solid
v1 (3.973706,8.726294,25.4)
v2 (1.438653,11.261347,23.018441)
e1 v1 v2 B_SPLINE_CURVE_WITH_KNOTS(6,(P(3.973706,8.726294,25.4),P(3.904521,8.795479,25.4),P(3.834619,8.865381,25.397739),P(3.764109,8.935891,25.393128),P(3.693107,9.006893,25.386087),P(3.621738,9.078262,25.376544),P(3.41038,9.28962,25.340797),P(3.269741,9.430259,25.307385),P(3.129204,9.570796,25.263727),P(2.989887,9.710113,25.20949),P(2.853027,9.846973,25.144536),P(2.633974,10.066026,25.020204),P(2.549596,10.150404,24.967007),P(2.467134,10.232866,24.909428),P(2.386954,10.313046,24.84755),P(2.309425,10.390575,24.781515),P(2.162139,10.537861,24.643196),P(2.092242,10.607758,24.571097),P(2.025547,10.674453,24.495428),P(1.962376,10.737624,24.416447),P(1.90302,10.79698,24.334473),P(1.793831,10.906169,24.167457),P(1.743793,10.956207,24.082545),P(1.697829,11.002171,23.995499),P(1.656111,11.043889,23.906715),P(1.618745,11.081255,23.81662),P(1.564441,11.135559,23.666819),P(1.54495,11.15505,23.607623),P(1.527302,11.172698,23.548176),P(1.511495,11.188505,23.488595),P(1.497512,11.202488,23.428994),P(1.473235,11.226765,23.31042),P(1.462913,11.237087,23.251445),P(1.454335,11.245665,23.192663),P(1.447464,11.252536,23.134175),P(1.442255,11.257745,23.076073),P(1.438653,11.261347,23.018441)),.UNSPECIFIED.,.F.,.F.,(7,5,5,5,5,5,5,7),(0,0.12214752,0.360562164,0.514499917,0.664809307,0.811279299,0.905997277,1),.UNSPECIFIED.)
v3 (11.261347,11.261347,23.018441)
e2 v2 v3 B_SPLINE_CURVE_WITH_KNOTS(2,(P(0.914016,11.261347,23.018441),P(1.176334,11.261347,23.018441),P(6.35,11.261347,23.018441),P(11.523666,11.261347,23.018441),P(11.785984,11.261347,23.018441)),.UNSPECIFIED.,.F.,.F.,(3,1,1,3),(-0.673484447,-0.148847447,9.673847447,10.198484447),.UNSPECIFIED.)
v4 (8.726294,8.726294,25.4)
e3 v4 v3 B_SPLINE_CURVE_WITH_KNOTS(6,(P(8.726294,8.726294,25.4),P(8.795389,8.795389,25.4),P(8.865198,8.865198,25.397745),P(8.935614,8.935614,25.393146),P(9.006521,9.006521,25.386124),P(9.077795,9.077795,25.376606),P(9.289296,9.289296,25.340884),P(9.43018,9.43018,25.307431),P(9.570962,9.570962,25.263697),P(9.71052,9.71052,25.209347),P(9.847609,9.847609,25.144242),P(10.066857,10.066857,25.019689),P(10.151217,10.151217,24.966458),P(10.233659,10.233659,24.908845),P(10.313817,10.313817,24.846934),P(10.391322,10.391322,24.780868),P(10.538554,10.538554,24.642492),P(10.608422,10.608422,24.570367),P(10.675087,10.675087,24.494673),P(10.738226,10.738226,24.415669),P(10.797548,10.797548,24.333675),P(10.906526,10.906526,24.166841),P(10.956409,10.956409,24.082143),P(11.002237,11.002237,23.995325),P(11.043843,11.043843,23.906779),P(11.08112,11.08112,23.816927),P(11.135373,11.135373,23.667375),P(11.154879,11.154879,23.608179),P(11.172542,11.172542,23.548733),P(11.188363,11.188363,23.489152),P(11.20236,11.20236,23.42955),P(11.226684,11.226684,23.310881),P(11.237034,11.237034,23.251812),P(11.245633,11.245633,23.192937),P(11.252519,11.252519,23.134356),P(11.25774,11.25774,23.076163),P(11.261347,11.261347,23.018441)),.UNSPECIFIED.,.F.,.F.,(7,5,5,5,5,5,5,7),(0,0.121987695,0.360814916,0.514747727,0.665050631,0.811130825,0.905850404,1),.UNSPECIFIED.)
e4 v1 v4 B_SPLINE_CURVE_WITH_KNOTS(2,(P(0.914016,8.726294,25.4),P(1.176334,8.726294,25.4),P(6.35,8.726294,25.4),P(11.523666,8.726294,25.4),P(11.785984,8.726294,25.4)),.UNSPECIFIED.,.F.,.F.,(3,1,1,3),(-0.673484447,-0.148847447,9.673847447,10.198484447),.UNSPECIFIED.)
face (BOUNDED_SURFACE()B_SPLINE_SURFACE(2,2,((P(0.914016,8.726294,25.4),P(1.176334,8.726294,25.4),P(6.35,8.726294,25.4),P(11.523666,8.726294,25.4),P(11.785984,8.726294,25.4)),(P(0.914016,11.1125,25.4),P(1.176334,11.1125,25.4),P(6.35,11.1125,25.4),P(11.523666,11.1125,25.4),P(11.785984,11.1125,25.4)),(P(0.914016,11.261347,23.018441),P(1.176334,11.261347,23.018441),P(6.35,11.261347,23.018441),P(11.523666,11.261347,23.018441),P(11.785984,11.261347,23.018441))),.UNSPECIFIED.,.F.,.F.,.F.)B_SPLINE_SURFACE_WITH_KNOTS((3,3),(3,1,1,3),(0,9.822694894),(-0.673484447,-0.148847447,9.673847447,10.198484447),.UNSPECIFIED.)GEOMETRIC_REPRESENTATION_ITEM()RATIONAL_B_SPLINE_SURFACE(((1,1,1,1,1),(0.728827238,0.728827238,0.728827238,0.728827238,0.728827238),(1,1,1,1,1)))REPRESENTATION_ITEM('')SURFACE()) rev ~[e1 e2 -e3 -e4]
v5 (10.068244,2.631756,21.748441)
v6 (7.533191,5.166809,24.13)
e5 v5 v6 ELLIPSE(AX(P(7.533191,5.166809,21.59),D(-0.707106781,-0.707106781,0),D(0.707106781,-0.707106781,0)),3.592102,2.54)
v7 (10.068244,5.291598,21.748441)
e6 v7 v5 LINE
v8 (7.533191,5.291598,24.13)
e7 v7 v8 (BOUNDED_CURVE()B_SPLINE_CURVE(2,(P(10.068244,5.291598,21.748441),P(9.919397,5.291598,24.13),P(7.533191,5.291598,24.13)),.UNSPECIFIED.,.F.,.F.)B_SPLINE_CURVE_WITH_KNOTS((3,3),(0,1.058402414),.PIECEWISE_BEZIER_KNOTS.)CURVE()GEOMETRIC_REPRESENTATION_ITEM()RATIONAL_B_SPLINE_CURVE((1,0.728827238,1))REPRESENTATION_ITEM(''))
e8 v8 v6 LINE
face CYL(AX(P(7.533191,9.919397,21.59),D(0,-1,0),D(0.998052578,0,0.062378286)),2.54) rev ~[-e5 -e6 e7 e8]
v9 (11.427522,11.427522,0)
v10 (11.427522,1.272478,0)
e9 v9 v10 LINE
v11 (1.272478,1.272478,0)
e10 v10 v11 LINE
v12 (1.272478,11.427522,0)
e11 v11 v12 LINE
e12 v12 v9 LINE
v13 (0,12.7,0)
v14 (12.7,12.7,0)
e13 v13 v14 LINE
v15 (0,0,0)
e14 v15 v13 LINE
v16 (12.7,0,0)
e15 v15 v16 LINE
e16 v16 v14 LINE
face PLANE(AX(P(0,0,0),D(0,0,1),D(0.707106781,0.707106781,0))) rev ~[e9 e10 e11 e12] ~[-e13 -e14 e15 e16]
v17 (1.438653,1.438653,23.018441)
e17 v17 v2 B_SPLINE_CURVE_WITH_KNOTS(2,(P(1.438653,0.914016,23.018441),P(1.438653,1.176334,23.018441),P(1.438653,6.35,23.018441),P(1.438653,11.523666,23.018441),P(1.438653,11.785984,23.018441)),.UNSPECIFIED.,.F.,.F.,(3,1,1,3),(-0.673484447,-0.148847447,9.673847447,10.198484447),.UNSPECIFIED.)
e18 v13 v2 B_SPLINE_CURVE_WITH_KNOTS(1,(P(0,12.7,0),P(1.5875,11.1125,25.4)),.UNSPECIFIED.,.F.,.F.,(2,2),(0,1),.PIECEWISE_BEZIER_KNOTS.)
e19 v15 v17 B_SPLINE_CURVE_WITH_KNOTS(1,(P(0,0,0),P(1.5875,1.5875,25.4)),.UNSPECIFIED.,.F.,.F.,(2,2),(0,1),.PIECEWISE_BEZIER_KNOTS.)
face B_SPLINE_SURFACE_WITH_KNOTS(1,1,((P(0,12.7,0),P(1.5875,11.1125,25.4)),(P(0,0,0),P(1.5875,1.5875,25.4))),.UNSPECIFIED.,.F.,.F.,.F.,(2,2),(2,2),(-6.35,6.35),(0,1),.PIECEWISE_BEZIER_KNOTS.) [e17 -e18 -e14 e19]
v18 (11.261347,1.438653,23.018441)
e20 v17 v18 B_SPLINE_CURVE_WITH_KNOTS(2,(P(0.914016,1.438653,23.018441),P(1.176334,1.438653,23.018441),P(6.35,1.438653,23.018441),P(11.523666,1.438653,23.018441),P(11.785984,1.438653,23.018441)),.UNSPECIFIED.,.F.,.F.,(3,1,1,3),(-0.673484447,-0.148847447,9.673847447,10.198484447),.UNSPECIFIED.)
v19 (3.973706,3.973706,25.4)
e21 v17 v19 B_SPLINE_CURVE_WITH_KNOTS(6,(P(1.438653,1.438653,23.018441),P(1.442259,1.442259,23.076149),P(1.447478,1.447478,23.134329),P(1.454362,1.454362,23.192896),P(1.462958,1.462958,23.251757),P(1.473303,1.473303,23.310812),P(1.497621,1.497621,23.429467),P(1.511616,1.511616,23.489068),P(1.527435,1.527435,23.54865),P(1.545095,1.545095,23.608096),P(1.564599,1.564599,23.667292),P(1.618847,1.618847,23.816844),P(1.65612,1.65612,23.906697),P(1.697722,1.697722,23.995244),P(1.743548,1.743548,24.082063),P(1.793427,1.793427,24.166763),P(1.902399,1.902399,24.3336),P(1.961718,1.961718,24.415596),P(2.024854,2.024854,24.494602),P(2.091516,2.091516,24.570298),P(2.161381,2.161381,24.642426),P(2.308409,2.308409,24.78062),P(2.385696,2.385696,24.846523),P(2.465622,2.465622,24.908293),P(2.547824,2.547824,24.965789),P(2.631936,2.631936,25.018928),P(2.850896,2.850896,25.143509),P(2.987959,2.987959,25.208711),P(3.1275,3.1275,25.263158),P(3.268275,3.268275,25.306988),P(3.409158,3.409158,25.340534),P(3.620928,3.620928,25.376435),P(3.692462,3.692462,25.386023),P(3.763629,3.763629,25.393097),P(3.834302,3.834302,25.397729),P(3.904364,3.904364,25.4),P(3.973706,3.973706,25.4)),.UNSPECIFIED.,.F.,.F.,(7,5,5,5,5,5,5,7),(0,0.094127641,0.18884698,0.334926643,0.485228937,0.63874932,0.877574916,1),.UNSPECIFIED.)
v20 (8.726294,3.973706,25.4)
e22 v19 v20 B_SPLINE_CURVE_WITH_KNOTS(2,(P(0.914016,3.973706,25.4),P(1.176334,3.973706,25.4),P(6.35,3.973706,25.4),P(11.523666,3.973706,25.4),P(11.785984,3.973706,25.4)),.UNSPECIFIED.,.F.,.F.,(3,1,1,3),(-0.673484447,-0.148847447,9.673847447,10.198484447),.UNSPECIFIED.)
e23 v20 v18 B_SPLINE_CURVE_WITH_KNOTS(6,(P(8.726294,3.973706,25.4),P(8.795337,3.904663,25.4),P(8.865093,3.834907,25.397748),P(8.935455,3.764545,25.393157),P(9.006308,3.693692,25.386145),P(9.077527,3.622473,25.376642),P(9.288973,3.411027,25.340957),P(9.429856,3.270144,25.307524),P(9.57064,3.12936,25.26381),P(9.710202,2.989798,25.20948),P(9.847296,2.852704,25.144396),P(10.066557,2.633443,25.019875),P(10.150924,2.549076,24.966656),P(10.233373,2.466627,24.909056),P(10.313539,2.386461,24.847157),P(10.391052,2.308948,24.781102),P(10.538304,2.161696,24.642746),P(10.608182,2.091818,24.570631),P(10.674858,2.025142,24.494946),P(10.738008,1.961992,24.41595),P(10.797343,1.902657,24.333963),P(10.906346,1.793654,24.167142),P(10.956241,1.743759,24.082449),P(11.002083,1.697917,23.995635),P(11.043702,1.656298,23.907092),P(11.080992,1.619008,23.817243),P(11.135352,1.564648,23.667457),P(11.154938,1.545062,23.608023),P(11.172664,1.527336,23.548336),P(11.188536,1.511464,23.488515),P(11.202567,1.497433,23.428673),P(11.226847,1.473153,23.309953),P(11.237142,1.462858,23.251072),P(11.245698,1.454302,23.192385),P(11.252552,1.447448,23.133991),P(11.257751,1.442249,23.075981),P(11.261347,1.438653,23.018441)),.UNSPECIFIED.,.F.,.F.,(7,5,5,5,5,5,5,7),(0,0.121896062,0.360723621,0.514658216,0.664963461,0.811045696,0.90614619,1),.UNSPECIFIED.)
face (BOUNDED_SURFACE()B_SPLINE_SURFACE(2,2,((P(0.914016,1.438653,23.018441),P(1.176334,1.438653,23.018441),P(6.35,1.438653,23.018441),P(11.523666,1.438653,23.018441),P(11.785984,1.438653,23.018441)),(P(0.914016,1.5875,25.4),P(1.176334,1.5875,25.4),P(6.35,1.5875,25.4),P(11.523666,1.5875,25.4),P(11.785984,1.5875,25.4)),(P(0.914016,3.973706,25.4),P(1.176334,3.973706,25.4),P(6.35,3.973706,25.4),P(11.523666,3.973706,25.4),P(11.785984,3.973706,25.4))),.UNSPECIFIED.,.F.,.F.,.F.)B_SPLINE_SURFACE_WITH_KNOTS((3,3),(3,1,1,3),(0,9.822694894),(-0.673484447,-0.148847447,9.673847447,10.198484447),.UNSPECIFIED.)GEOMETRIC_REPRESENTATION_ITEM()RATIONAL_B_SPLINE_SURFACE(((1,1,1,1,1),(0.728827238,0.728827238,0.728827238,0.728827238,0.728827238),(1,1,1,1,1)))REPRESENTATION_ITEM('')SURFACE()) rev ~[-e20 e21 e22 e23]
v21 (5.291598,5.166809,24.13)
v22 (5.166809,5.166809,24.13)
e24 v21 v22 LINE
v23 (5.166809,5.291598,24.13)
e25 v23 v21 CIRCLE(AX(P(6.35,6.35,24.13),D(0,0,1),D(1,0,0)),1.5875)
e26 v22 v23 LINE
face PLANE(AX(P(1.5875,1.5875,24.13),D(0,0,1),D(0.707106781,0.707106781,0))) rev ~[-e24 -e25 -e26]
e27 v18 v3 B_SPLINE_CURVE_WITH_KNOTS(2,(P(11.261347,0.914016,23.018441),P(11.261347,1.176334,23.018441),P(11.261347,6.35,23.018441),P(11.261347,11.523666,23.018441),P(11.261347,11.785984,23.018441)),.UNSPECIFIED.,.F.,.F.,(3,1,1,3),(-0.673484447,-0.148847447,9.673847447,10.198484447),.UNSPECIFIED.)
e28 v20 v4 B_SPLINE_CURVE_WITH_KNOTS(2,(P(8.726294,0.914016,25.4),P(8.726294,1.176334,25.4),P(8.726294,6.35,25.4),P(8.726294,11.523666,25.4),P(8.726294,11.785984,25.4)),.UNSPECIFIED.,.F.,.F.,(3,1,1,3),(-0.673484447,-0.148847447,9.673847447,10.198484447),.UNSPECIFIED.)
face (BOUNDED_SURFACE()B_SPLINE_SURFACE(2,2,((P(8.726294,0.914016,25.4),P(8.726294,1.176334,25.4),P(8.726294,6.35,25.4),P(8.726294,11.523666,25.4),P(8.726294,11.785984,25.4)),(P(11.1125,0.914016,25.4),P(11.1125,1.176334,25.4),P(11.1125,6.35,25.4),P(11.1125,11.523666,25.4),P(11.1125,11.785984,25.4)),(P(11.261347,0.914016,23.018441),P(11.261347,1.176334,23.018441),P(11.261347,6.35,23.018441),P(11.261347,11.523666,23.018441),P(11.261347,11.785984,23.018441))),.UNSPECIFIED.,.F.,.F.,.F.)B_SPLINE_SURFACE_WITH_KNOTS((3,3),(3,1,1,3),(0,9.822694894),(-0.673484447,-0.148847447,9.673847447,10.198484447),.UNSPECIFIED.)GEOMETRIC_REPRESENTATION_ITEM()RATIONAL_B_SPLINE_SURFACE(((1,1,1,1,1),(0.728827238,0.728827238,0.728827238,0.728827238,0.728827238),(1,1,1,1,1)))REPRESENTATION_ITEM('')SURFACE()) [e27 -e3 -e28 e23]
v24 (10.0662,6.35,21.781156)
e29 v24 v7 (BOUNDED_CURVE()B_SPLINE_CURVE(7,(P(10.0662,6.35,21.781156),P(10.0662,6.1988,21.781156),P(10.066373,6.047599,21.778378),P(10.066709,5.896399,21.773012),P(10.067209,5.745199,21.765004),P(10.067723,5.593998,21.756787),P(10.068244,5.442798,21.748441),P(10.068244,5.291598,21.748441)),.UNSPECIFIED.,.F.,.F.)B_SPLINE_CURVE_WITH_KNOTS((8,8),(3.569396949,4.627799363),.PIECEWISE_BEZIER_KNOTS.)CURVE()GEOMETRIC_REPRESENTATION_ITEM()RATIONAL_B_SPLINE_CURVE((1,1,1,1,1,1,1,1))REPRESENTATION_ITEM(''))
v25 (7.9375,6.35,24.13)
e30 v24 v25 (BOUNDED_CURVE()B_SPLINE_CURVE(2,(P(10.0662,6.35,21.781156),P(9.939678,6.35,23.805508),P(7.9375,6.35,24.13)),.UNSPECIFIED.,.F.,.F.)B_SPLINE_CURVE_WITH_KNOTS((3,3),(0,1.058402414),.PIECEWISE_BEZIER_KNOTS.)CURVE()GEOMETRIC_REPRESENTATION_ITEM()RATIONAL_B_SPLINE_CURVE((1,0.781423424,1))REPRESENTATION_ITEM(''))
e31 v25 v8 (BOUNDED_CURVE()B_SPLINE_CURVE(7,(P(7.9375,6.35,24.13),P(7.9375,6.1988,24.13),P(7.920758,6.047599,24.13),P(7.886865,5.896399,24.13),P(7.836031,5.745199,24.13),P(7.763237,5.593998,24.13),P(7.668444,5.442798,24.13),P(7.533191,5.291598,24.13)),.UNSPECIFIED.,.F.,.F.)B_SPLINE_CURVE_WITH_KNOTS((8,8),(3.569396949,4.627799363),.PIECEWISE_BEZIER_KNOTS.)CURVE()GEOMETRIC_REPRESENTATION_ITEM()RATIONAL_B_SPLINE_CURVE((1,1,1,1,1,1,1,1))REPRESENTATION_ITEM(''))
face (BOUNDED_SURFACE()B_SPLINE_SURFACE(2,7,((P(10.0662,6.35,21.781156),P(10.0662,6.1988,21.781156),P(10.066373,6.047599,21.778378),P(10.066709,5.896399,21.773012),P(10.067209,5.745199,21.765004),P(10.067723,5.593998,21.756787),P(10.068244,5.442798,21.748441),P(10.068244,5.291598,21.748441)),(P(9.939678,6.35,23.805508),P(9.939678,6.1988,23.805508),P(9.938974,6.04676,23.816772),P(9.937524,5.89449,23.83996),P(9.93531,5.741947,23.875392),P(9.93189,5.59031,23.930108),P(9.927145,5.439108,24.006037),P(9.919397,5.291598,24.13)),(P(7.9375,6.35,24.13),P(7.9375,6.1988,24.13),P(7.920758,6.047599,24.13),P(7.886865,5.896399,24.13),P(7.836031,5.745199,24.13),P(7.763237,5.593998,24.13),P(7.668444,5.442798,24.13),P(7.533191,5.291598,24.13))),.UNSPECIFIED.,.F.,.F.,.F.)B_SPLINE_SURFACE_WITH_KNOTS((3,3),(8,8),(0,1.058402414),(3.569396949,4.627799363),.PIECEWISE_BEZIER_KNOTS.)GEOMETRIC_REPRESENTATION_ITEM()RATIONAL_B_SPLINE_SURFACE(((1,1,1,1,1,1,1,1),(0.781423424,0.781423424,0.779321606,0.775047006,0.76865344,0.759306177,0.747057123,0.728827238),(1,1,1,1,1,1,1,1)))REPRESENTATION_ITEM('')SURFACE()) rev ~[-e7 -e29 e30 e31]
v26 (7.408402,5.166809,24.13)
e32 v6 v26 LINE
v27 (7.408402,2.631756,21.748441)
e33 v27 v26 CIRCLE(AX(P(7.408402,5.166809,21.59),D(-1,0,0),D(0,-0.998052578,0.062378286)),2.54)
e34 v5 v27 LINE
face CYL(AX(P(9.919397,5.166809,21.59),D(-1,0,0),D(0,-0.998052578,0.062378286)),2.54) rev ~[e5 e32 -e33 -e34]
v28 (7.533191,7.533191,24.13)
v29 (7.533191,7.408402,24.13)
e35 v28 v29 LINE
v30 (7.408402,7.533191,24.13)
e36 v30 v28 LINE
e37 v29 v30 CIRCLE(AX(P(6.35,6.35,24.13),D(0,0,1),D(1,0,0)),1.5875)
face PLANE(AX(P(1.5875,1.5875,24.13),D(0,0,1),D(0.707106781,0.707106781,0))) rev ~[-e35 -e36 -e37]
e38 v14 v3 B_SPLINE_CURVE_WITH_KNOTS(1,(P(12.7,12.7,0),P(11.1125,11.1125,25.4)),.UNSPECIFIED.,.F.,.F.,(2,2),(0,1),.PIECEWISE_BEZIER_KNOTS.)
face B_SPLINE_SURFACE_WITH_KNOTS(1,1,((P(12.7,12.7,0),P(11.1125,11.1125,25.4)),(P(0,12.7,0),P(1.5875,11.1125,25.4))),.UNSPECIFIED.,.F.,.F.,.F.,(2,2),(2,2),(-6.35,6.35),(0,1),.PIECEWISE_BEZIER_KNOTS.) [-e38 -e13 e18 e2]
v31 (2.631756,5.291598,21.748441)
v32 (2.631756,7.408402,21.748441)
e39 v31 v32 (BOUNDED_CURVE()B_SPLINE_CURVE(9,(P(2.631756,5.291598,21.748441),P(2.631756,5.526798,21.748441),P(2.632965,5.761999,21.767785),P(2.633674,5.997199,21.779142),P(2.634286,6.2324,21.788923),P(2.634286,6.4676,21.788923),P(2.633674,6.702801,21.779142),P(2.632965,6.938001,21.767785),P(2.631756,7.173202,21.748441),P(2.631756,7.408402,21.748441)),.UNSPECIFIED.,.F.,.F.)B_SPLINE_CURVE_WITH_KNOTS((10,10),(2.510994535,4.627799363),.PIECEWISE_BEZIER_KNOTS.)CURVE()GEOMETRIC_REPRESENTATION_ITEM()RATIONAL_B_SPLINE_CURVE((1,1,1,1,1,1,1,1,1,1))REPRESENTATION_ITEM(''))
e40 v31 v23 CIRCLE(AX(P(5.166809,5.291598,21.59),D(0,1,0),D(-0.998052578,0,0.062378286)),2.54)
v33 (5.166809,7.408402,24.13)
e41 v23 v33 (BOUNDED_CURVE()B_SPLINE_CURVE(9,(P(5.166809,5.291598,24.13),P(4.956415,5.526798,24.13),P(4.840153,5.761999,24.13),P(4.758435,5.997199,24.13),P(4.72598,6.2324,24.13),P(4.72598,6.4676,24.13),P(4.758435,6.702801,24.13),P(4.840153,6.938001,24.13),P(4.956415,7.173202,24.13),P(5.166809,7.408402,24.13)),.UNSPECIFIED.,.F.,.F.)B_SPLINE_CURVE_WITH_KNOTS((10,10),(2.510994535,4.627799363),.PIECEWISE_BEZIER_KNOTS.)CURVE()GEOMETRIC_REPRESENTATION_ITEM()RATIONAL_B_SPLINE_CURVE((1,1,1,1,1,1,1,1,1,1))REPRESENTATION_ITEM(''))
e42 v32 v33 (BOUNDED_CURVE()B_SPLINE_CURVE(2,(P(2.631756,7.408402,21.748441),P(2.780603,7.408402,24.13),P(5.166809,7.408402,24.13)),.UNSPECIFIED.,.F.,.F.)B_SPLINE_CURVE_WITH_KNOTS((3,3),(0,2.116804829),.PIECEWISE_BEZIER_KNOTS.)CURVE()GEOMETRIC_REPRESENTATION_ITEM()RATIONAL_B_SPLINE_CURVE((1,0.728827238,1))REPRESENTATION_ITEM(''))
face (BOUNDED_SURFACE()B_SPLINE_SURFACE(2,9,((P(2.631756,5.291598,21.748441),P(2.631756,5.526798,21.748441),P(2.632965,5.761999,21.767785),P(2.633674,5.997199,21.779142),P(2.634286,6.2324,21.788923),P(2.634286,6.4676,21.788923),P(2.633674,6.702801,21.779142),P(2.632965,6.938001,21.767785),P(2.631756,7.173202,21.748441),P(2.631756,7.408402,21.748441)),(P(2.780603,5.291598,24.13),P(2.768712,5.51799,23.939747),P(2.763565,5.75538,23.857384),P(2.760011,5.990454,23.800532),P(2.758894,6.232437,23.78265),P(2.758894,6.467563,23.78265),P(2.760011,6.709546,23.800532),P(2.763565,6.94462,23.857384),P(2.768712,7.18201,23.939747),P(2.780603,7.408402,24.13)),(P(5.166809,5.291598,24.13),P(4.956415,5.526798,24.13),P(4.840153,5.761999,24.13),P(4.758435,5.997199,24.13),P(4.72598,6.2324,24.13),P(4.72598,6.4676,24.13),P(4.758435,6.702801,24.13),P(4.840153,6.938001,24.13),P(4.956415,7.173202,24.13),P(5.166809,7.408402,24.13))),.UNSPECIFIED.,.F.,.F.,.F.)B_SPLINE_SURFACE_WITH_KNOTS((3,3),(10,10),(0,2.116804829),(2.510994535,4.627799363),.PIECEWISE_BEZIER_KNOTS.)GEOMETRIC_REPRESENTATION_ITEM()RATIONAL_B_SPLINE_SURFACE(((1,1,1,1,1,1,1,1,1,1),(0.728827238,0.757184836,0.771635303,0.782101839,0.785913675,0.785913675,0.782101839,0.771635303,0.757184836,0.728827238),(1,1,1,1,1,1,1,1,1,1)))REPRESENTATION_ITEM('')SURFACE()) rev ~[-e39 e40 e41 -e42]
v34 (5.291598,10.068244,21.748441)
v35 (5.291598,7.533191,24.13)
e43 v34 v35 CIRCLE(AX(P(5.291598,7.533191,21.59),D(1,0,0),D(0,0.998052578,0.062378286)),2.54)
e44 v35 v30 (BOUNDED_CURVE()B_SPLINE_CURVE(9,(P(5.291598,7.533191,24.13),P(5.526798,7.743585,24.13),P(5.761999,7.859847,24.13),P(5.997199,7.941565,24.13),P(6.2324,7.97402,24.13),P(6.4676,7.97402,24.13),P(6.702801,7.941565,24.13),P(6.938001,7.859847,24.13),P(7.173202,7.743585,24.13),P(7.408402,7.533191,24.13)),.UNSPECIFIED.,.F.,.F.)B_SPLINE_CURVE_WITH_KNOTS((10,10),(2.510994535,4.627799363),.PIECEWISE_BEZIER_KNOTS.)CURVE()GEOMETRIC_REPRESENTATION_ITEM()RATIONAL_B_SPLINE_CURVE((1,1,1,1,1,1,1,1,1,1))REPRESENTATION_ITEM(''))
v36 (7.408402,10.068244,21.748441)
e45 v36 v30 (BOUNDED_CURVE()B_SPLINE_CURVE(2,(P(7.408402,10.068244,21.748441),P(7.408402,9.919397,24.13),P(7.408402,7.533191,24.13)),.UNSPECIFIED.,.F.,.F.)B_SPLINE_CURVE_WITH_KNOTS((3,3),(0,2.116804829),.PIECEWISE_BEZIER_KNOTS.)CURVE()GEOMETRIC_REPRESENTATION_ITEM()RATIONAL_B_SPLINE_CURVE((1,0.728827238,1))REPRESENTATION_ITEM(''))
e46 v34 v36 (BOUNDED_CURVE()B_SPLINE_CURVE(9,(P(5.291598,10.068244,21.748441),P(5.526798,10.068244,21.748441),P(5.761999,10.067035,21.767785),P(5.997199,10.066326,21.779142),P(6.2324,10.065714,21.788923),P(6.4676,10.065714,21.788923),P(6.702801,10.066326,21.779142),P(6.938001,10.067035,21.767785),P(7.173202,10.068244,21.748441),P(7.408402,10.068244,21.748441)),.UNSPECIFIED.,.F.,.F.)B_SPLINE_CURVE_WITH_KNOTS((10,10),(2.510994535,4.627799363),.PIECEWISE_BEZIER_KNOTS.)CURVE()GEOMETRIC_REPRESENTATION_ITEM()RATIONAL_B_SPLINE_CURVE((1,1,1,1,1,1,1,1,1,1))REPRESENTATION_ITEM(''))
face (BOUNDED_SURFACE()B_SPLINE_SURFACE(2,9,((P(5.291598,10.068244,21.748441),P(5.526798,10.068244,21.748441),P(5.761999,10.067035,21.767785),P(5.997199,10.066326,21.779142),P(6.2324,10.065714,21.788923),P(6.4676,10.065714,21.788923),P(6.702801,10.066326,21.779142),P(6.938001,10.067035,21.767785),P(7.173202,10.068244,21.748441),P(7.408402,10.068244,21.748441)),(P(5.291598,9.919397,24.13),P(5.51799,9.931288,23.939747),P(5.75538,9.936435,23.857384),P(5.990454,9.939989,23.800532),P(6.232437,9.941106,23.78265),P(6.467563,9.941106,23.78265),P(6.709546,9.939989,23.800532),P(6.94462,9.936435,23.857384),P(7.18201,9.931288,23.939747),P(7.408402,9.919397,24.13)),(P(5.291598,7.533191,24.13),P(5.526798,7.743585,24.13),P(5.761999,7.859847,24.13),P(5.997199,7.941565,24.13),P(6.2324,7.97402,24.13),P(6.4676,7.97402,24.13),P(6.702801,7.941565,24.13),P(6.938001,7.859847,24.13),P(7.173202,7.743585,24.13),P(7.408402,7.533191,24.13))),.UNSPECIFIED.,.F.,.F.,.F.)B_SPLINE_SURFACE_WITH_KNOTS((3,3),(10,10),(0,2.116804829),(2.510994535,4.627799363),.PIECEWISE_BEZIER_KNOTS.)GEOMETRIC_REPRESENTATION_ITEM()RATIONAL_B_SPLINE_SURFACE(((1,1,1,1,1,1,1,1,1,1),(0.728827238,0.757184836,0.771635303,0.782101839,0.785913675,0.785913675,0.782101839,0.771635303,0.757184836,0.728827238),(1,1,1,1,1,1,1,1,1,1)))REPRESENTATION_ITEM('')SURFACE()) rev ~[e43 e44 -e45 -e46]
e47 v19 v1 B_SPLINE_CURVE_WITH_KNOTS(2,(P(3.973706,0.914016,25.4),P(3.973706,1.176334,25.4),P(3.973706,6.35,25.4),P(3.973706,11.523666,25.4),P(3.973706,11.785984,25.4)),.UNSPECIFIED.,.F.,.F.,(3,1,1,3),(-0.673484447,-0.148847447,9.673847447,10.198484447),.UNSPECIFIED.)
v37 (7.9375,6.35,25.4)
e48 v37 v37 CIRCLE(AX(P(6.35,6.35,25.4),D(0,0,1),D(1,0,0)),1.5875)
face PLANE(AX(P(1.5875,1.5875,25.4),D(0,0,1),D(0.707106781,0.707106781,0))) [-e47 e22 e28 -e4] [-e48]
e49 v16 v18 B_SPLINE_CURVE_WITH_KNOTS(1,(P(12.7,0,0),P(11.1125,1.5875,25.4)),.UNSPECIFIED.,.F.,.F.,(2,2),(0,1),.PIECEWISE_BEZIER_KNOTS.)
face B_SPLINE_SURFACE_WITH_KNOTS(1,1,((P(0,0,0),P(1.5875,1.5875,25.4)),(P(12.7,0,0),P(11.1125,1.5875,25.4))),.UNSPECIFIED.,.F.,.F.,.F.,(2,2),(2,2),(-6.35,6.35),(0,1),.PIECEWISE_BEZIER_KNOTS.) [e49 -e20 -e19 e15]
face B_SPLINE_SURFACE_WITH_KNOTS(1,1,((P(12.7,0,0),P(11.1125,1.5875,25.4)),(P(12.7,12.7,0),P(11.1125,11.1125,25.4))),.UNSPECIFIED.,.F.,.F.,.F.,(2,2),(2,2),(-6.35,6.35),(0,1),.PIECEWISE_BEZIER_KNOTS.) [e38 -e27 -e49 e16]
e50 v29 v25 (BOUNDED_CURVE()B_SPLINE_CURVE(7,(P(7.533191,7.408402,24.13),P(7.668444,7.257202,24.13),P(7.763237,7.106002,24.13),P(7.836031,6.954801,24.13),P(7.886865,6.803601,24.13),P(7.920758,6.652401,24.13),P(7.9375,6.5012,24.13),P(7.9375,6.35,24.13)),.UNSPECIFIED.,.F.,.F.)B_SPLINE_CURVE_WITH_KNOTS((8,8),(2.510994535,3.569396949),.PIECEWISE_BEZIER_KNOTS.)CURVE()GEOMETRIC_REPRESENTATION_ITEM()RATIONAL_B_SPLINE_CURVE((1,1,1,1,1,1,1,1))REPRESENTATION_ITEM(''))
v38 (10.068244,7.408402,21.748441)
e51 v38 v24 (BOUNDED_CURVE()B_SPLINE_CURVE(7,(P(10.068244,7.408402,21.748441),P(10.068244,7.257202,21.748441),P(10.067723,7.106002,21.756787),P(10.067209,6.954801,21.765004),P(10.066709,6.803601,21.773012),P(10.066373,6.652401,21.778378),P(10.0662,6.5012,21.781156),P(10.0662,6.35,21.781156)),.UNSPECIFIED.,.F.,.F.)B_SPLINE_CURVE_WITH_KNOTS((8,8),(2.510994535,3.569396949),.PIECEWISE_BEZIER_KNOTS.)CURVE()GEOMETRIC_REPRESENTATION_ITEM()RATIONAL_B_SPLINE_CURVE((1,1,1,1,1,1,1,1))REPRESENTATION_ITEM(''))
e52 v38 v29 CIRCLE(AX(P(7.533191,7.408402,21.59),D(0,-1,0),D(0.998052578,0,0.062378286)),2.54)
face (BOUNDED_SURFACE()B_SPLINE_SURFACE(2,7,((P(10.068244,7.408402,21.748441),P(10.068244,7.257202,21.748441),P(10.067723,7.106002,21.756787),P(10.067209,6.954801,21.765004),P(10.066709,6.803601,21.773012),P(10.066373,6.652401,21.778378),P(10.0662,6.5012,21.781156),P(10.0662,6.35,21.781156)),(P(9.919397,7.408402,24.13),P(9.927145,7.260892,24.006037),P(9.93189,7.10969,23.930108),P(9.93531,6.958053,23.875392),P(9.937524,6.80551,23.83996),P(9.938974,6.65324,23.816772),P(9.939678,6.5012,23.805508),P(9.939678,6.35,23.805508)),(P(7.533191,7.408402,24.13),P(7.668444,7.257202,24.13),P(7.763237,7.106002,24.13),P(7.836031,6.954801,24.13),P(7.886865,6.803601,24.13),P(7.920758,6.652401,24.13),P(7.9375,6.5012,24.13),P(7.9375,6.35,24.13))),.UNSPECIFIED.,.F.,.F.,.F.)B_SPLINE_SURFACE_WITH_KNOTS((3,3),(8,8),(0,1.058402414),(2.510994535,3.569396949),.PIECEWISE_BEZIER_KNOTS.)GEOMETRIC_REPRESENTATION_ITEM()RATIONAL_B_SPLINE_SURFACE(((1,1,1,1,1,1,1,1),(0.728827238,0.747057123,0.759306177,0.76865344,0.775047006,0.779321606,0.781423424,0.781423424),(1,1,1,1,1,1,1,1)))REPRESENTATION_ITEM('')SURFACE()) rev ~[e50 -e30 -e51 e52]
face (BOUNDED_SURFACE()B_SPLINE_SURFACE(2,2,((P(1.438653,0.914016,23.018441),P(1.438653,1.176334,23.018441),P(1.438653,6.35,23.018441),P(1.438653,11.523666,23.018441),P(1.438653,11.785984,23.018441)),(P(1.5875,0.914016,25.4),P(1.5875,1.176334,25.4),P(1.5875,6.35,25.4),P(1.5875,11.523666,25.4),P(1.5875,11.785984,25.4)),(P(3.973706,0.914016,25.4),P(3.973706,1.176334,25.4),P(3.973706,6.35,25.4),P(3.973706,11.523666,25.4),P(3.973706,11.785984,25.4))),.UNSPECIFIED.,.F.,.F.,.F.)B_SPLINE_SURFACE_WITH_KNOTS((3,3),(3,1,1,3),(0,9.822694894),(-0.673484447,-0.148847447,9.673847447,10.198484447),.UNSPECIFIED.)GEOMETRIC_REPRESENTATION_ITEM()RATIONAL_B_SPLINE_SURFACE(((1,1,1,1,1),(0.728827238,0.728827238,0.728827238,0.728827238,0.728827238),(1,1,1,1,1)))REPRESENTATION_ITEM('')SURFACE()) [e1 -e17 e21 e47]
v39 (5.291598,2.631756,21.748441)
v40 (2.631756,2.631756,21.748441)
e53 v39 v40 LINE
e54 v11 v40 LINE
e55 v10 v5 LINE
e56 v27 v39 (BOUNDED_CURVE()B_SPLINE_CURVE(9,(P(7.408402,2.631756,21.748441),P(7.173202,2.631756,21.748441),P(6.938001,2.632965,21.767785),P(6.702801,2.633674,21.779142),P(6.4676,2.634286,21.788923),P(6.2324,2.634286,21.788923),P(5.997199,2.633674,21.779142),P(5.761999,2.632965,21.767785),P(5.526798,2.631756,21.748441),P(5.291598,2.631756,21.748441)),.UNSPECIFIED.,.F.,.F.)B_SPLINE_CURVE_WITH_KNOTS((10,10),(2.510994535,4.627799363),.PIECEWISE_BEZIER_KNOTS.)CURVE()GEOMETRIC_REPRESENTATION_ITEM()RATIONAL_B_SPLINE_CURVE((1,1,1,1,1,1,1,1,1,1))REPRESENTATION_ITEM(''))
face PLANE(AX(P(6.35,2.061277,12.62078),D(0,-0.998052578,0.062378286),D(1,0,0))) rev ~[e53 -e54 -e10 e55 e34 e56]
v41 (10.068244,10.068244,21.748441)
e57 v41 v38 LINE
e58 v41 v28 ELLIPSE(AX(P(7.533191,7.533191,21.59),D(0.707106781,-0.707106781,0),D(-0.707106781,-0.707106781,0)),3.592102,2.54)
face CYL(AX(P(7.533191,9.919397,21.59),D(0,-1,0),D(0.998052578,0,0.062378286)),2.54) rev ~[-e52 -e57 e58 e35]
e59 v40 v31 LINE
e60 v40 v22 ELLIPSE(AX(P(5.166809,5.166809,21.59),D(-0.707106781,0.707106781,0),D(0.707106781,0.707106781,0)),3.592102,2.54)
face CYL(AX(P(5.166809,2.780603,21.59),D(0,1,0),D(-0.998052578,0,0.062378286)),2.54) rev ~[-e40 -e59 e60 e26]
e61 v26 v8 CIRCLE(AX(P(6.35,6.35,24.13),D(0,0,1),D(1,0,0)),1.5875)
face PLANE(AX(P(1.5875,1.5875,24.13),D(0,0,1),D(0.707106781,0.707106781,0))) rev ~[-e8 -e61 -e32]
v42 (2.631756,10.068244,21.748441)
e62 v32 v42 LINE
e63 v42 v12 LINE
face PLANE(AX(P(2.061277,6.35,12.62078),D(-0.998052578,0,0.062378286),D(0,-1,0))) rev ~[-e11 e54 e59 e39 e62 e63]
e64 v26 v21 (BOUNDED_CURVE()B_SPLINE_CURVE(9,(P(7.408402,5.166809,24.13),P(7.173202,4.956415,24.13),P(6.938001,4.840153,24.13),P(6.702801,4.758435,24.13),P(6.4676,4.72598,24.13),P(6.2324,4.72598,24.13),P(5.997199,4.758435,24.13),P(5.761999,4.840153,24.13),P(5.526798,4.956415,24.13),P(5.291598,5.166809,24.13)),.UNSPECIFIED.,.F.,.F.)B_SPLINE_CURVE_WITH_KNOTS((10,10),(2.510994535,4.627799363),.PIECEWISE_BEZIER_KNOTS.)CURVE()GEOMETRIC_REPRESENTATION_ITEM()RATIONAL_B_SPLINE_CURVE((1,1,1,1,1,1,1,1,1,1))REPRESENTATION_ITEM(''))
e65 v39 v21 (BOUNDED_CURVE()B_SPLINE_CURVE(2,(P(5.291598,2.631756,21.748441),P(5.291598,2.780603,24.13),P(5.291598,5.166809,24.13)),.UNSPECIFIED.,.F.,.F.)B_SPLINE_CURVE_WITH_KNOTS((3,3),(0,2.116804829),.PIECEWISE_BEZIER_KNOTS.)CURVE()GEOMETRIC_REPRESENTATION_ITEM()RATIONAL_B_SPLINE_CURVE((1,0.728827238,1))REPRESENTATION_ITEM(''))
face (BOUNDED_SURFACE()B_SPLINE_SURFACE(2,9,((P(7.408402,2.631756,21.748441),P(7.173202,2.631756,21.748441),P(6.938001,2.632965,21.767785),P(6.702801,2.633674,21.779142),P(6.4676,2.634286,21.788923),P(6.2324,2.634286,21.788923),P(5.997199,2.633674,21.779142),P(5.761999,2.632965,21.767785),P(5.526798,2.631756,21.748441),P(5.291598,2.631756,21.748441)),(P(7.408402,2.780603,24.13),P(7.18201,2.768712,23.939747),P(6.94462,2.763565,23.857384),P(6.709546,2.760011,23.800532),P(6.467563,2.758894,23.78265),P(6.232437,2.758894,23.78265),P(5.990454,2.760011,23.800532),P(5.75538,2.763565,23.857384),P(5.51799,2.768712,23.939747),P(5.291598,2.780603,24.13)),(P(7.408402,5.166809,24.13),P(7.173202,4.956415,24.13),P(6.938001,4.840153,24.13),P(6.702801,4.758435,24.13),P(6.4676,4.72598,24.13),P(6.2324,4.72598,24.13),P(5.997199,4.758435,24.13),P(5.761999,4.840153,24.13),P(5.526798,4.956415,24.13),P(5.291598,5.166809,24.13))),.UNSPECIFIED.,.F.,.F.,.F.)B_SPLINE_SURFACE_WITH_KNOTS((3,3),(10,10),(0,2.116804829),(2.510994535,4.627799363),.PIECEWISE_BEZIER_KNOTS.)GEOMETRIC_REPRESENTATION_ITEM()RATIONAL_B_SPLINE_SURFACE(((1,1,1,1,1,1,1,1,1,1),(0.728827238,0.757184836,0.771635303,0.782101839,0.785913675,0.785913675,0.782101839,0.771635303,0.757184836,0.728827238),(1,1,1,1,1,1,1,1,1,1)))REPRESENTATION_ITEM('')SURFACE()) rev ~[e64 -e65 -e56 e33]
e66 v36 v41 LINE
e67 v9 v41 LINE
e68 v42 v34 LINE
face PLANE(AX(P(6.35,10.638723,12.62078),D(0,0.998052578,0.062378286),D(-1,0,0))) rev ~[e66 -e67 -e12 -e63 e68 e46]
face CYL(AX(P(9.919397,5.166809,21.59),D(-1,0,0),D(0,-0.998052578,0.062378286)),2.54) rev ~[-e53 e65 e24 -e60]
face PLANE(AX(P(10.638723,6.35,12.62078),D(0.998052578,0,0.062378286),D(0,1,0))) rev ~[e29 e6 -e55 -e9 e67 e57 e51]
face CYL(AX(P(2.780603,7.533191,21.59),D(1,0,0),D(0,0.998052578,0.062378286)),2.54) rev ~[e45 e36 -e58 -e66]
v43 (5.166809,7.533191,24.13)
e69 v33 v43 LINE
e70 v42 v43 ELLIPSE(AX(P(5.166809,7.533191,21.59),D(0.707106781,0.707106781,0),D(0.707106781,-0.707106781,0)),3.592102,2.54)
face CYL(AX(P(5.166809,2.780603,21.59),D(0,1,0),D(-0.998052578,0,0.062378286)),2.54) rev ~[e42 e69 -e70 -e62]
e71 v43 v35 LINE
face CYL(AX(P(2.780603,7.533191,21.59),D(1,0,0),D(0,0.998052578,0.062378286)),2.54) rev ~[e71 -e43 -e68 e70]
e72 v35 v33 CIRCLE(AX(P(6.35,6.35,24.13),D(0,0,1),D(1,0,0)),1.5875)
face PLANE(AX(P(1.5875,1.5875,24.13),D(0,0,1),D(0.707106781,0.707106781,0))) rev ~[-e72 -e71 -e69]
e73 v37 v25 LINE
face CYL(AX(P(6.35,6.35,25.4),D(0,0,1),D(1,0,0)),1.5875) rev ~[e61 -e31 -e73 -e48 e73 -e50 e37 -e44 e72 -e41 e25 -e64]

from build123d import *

# Parameters (mm, degrees)
F0_W     = 12.7
F0_H     = 12.7
F2_W     = 9.525
F2_H     = 9.525
F4_T     = -1.27
F5_R     = 1.5875
F6_DEPTH = 25.4
F7_R     = 2.54


with BuildPart() as f3:
    # F0 (on Top) → F3 section 0
    with BuildSketch(Plane.XY):
        with Locations((6.35, 6.35)):
            Rectangle(F0_W, F0_H)
    # F2 (on offset) → F3 section 1
    with BuildSketch(Plane.XY.offset(25.4)):
        with Locations((6.35, 6.35)):
            Rectangle(F2_W, F2_H)
    loft()

    # F4
    f4_openings = [f3.faces().sort_by_distance(p)[0] for p in [
        (6.35, 6.35, 0),
    ]]
    offset(amount=F4_T, openings=f4_openings)

    # F5 (on face) → F6 (cut)
    with BuildSketch(Plane.XY.offset(25.4)):
        with Locations((6.35, 6.35)):
            Circle(F5_R)
    extrude(amount=-F6_DEPTH, mode=Mode.SUBTRACT)

    # F7
    f7_edges = [f3.edges().sort_by_distance(p)[0] for p in [
        (6.35, 11.1125, 25.4),
        (11.1125, 6.35, 25.4),
        (6.35, 1.5875, 25.4),
        (1.5875, 6.35, 25.4),
        (9.919397, 6.35, 24.13),
        (6.35, 9.919397, 24.13),
        (2.780603, 6.35, 24.13),
        (6.35, 2.780603, 24.13),
    ]]
    fillet(f7_edges, radius=F7_R)


solid = f3.part
